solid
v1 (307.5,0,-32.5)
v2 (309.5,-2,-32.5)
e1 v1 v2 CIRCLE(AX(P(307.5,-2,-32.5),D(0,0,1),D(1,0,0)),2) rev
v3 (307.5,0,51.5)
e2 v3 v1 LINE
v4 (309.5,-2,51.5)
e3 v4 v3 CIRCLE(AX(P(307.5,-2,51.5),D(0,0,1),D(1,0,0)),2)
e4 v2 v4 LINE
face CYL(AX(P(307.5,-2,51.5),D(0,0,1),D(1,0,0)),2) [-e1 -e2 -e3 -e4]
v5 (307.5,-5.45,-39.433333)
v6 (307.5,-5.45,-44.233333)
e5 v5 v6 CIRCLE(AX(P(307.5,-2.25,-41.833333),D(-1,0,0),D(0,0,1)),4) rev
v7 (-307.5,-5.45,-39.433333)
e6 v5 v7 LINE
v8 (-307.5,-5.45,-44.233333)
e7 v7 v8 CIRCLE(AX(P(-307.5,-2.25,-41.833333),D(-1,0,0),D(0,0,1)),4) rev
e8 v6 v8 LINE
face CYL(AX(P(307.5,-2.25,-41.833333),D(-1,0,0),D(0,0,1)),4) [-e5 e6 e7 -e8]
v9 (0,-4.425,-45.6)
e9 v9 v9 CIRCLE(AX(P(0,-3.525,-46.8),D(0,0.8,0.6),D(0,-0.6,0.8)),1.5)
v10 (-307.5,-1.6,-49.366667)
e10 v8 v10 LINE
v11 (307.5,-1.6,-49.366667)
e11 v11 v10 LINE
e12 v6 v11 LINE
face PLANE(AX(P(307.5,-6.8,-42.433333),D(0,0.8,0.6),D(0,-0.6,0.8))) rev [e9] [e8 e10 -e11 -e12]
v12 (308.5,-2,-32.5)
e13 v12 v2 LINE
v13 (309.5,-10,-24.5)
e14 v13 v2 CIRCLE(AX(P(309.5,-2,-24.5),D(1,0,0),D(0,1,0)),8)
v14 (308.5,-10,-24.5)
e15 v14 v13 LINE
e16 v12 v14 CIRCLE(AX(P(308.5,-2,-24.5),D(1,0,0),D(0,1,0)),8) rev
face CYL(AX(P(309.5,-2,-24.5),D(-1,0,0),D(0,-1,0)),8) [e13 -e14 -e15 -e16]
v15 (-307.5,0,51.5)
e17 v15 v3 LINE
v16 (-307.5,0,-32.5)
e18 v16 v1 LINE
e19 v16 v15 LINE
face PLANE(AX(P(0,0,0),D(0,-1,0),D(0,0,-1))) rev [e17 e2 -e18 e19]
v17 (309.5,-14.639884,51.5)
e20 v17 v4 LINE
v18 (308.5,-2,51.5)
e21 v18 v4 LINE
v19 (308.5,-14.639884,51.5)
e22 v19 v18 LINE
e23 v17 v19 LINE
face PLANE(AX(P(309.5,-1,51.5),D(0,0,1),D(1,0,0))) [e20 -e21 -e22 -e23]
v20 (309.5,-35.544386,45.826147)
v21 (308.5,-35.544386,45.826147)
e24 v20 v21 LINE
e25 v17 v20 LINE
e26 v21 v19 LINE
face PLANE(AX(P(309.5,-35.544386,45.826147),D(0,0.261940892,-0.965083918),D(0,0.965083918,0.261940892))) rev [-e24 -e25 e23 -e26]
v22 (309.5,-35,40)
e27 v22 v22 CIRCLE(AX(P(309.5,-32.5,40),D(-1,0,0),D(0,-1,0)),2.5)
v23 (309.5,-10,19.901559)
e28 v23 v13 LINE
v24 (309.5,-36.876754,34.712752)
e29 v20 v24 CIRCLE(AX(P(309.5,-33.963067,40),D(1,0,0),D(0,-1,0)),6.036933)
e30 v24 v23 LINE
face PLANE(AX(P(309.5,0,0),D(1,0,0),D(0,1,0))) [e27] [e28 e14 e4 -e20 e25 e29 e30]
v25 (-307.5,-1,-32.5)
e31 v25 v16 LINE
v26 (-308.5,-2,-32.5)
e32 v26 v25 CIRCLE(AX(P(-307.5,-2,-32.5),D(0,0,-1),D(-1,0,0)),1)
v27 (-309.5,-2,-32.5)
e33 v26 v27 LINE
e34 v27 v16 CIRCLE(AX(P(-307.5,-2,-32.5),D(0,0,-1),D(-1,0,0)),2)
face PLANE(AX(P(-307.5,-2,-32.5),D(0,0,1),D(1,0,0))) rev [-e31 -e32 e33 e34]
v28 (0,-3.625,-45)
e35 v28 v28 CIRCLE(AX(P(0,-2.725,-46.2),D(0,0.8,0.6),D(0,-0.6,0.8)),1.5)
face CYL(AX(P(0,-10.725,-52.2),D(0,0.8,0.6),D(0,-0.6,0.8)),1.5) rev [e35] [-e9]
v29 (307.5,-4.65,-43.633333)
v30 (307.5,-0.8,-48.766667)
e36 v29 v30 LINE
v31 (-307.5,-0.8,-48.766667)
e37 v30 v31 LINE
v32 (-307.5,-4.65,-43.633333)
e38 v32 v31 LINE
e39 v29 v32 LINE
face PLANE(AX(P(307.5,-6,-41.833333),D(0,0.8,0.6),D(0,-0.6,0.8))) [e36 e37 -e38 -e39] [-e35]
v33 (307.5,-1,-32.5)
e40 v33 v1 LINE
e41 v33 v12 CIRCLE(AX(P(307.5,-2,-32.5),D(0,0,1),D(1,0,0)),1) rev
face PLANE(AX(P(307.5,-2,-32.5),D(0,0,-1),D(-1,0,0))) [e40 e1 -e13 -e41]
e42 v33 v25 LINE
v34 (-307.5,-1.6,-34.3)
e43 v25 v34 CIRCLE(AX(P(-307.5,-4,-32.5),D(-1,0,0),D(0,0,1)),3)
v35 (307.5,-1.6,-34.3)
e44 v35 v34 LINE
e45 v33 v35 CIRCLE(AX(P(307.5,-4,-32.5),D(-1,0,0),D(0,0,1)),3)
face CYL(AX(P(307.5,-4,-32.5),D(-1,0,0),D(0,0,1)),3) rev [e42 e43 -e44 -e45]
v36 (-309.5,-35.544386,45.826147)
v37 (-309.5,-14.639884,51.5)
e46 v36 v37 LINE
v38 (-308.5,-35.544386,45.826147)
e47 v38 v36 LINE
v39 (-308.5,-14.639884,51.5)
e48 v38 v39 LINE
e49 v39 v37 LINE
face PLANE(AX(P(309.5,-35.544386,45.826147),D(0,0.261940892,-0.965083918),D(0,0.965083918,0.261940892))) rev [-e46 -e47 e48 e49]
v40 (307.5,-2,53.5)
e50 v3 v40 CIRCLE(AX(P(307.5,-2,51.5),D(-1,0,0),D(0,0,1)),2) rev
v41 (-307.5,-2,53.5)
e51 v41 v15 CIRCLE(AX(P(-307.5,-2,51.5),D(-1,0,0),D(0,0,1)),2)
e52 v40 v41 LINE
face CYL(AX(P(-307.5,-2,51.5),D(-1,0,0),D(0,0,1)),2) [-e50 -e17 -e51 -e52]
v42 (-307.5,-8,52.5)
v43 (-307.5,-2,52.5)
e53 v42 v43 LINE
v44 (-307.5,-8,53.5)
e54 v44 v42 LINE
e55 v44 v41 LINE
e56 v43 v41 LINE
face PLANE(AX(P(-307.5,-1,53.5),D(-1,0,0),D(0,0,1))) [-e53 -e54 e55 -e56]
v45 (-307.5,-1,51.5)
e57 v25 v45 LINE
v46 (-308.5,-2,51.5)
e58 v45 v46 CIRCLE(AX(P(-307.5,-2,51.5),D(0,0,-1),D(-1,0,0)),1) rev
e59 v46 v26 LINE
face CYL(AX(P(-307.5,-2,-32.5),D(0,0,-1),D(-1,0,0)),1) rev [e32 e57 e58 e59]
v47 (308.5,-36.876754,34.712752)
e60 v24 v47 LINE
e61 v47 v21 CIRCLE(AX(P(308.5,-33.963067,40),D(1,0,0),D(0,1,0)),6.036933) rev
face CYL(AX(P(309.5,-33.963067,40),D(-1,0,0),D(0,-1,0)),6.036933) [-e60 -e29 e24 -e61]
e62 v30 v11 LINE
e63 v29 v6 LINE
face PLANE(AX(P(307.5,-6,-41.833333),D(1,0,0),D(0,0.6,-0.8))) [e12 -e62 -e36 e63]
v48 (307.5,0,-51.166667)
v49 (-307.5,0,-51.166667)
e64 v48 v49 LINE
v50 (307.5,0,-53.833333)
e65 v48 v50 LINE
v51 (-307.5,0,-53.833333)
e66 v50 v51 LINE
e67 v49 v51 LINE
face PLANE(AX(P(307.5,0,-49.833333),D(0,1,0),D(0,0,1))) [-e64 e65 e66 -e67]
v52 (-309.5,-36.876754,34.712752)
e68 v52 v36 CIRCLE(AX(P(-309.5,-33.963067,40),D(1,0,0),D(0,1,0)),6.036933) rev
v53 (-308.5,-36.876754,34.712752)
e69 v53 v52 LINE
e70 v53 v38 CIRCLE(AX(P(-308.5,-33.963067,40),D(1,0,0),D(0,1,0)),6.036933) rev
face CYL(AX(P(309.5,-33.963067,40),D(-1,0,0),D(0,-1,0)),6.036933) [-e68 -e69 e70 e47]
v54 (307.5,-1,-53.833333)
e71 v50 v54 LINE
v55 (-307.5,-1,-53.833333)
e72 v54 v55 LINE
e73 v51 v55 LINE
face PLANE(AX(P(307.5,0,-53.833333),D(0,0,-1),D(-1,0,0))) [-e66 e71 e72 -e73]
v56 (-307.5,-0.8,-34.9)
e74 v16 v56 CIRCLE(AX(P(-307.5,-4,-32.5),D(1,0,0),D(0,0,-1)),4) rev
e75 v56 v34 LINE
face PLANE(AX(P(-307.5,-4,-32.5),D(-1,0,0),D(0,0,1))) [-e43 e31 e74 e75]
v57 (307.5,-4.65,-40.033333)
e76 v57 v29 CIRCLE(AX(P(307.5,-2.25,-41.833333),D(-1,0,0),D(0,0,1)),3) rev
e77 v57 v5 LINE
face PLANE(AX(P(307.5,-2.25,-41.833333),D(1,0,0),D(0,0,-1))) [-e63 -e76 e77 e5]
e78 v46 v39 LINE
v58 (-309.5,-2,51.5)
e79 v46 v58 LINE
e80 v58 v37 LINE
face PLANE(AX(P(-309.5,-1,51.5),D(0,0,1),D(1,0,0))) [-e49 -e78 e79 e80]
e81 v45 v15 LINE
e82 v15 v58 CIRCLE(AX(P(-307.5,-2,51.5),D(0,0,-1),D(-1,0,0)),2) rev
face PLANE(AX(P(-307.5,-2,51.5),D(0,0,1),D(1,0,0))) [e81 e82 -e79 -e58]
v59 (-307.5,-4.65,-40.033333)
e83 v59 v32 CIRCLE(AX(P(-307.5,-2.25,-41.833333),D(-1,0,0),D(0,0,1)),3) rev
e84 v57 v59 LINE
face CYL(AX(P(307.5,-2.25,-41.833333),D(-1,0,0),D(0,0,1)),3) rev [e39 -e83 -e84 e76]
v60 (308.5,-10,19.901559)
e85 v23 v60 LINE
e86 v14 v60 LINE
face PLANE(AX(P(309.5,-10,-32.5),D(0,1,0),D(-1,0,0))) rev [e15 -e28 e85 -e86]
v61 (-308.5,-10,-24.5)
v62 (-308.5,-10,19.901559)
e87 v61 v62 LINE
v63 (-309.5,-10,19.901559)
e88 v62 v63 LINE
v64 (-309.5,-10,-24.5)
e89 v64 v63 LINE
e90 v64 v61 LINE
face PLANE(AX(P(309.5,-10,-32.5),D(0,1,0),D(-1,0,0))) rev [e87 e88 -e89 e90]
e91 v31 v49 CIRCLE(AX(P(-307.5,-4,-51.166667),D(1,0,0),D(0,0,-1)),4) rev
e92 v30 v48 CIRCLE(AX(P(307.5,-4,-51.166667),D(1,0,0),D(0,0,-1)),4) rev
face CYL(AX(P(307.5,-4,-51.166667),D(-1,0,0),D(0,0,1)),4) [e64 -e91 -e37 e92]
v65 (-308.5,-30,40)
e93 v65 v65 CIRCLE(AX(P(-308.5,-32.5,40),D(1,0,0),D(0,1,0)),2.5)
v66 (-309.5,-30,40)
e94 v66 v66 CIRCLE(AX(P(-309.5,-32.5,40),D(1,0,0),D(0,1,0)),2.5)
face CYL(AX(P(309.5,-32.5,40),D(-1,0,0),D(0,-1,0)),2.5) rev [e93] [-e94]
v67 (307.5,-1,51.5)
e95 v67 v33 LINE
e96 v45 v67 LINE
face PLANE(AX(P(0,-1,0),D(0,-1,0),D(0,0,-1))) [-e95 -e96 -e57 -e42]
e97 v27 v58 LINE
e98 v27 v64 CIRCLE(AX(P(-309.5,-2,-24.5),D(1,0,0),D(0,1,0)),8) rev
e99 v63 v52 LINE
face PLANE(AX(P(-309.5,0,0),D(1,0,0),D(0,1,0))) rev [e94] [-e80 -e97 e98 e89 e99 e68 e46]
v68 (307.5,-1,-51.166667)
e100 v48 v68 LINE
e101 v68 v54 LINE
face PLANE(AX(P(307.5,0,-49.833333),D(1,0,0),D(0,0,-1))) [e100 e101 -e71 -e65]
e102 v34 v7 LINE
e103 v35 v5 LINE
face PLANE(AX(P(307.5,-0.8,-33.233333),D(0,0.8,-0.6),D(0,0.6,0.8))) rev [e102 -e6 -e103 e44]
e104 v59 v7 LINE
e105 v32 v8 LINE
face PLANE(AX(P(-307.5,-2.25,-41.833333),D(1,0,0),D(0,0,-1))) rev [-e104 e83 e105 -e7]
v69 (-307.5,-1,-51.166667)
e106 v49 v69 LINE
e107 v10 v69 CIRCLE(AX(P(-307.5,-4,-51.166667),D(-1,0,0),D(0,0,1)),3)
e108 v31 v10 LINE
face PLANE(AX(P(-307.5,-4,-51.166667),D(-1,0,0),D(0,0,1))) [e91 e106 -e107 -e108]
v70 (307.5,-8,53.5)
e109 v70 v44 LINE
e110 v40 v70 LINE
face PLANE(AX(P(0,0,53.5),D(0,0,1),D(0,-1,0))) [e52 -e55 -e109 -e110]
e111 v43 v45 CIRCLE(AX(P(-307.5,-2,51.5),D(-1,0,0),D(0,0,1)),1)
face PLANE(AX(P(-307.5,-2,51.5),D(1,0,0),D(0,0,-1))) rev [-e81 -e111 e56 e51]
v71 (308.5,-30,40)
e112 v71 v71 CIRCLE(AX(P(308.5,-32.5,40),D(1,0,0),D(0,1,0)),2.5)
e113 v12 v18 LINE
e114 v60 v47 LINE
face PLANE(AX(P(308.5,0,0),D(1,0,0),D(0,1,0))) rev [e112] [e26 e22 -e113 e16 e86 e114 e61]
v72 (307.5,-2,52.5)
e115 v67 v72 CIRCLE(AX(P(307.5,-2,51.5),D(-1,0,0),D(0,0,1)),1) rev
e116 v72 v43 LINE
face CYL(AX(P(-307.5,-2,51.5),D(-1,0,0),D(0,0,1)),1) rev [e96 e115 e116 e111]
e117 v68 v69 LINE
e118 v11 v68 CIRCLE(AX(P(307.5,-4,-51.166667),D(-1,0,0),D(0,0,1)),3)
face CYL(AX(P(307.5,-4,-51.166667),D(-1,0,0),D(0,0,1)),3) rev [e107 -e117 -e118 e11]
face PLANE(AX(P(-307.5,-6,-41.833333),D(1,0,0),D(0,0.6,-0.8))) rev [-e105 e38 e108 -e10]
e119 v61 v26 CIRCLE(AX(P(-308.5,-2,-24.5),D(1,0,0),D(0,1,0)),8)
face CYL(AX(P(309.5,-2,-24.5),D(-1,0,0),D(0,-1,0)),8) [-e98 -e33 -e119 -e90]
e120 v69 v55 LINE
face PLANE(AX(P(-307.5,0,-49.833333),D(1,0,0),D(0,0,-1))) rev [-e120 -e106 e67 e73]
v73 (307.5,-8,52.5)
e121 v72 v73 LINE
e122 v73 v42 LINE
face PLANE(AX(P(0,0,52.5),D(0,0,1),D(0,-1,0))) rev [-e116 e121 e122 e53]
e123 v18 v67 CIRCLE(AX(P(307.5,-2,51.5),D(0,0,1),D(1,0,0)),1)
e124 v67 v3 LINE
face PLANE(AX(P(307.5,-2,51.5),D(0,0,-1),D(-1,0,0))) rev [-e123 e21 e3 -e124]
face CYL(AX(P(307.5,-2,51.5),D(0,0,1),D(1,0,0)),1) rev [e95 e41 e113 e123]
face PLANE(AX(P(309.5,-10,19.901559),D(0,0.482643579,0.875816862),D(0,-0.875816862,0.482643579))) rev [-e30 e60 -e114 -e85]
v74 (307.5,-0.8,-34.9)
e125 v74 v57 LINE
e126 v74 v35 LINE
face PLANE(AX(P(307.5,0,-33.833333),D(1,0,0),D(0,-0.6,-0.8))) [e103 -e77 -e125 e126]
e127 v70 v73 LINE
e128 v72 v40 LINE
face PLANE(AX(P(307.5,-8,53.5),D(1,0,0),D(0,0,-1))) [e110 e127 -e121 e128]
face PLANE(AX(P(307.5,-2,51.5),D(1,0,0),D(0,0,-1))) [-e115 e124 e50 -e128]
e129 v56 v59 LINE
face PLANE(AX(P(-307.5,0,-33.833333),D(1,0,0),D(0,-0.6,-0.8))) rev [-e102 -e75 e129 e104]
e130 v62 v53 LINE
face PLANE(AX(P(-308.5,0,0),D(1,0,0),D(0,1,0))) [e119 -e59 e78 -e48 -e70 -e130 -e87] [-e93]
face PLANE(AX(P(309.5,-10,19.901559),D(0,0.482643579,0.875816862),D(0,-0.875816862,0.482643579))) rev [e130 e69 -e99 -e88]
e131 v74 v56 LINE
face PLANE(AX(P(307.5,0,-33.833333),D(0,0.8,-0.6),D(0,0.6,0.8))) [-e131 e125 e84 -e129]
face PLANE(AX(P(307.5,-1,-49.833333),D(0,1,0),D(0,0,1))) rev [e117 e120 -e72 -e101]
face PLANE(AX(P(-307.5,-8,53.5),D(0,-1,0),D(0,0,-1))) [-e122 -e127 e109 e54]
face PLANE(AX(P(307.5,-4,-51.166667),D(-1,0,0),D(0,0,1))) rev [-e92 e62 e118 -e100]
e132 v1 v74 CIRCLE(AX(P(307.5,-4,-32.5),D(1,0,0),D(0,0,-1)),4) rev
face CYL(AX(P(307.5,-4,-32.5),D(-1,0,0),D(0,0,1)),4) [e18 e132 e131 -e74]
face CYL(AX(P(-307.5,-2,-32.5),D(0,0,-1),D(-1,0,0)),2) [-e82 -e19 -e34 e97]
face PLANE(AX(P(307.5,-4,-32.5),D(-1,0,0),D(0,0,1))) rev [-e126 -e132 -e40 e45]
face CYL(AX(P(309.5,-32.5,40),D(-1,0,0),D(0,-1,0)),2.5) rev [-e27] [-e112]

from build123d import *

# Parameters (mm, degrees)
SKETCH1_W                    = 615
SKETCH1_H                    = 105
BASE_FLANGE1_DEPTH           = 1
EDGE_FLANGE1_STRIP_W         = 6
EDGE_FLANGE1_STRIP_H         = 1
EDGE_FLANGE1_STRIP_CUT_DEPTH = 615
EDGE_FLANGE1_DEPTH           = 615
SKETCH16_W                   = 615
SKETCH16_H                   = 196.52545168
CUT_EXTRUDE1_DEPTH           = 10
SWEPT_START                  = -307.5
SWEPT_FLANGE1_DEPTH          = 615
EDGE_FLANGE2_DEPTH           = 84
EDGE_FLANGE2_BEND_DEPTH      = 84
CUT_EXTRUDE2_DEPTH           = 623.622700982
CUT_EXTRUDE2_DEPTH_BACK      = 623.622700982
SKETCH39_R                   = 2.5
FILLET1_R                    = 8
SKETCH45_R                   = 1.5
CUT_EXTRUDE3_DEPTH           = 10


# Read off the part's stored shape, not the designer's step: Swept Flange1
# Sheet-metal steps are written as plain solids
with BuildPart() as part:
    # Sketch1 → Base-Flange1 (new body)
    with BuildSketch(Plane(origin=(0, 0, 0), x_dir=(1, 0, 0), z_dir=(0, 1, 0))):
        Rectangle(SKETCH1_W, SKETCH1_H)
    extrude(amount=-BASE_FLANGE1_DEPTH)

    # Edge-Flange1 strip (across the edge) → Edge-Flange1 strip cut (cut)
    with BuildSketch(Plane(origin=(307.5, -1, 52.5), x_dir=(0, 0, -1), z_dir=(-1, 0, 0))):
        with Locations((-2, -0.5)):
            Rectangle(EDGE_FLANGE1_STRIP_W, EDGE_FLANGE1_STRIP_H)
    extrude(amount=EDGE_FLANGE1_STRIP_CUT_DEPTH, mode=Mode.SUBTRACT)

    # Edge-Flange1 section (across the edge) → Edge-Flange1 (add)
    with BuildSketch(Plane(origin=(307.5, -1, 52.5), x_dir=(0, 0, -1), z_dir=(-1, 0, 0))):
        with BuildLine():
            Line((-1, 1), (-1, 7))
            Line((-1, 7), (0, 7))
            Line((0, 7), (0, 1))
            ThreePointArc((0, 1), (0.292893219, 0.292893219), (1, 0))
            Line((1, 0), (1, -1))
            ThreePointArc((1, -1), (-0.414213562, -0.414213562), (-1, 1))
        make_face()
    extrude(amount=EDGE_FLANGE1_DEPTH)

    # Sketch16 → Cut-Extrude1 (cut)
    with BuildSketch(Plane(origin=(0, 0, 0), x_dir=(1, 0, 0), z_dir=(0, 1, 0))):
        with Locations((0, 130.76272584)):
            Rectangle(SKETCH16_W, SKETCH16_H)
    extrude(amount=-CUT_EXTRUDE1_DEPTH, mode=Mode.SUBTRACT)

    # Swept Flange1 outline → Swept Flange1 (add)
    with BuildSketch(Plane.YZ.offset(SWEPT_START)):
        with BuildLine():
            Line((-1, -51.166666667), (-1, -53.833333333))
            Line((-1, -53.833333333), (0, -53.833333333))
            Line((0, -53.833333333), (0, -51.166666667))
            ThreePointArc((0, -51.166666667), (-0.205266808, -49.901755603), (-0.8, -48.766666667))
            Line((-0.8, -48.766666667), (-4.65, -43.633333333))
            ThreePointArc((-4.65, -43.633333333), (-5.25, -41.833333333), (-4.65, -40.033333333))
            Line((-4.65, -40.033333333), (-0.8, -34.9))
            ThreePointArc((-0.8, -34.9), (-0.205266808, -33.764911064), (0, -32.5))
            Line((0, -32.5), (-1, -32.5))
            ThreePointArc((-1, -32.5), (-1.153950106, -33.448683298), (-1.6, -34.3))
            Line((-1.6, -34.3), (-5.45, -39.433333333))
            ThreePointArc((-5.45, -39.433333333), (-6.25, -41.833333333), (-5.45, -44.233333333))
            Line((-5.45, -44.233333333), (-1.6, -49.366666667))
            ThreePointArc((-1.6, -49.366666667), (-1.153950106, -50.217983369), (-1, -51.166666667))
        make_face()
    extrude(amount=SWEPT_FLANGE1_DEPTH)

    # Edge-Flange2 section (across the edge) → Edge-Flange2 (add)
    with BuildSketch(Plane(origin=(308.5, -1, -32.5), x_dir=(-1, 0, 0), z_dir=(0, 0, 1))):
        with BuildLine():
            Line((-1, 1), (-1, 39))
            Line((-1, 39), (0, 39))
            Line((0, 39), (0, 1))
            ThreePointArc((0, 1), (0.292893219, 0.292893219), (1, 0))
            Line((1, 0), (1, -1))
            ThreePointArc((1, -1), (-0.414213562, -0.414213562), (-1, 1))
        make_face()
    extrude(amount=EDGE_FLANGE2_DEPTH)

    # Edge-Flange2 section 2 (across the edge) → Edge-Flange2 bend (add)
    with BuildSketch(Plane(origin=(-308.5, -1, 51.5), x_dir=(1, 0, 0), z_dir=(0, 0, -1))):
        with BuildLine():
            Line((-1, 1), (-1, 39))
            Line((-1, 39), (0, 39))
            Line((0, 39), (0, 1))
            ThreePointArc((0, 1), (0.292893219, 0.292893219), (1, 0))
            Line((1, 0), (1, -1))
            ThreePointArc((1, -1), (-0.414213562, -0.414213562), (-1, 1))
        make_face()
    extrude(amount=EDGE_FLANGE2_BEND_DEPTH)

    # Sketch39 → Cut-Extrude2 (cut, two sides: drawn at the far end of the back side and taken through both)
    with BuildSketch(Plane.ZY.offset(309.5).offset(-CUT_EXTRUDE2_DEPTH_BACK)):
        with Locations(Location((40, -32.5, 0), (0, 0, 90))):
            Circle(SKETCH39_R)
        with BuildLine():
            Line((-32.5, -10), (19.901558991, -10))
            Line((19.901558991, -10), (34.712752069, -36.876753821))
            ThreePointArc((34.712752069, -36.876753821), (36.929590525, -39.160869046), (40, -40))
            ThreePointArc((40, -40), (43.667304301, -38.758423068), (45.82614719, -35.544386433))
            Line((45.82614719, -35.544386433), (51.5, -14.63988364))
            Line((51.5, -14.63988364), (60.41713226, -14.63988364))
            Line((60.41713226, -14.63988364), (60.41713226, -59.649041705))
            Line((60.41713226, -59.649041705), (-51.871278106, -59.649041705))
            Line((-51.871278106, -59.649041705), (-51.871278106, -10))
            Line((-51.871278106, -10), (-32.5, -10))
        make_face()
    extrude(amount=CUT_EXTRUDE2_DEPTH + CUT_EXTRUDE2_DEPTH_BACK, mode=Mode.SUBTRACT)

    # Fillet1
    fillet1_edges = [part.edges().sort_by_distance(p)[0] for p in [
        (-309, -10, -32.5),
        (309, -10, -32.5),
    ]]
    fillet(fillet1_edges, radius=FILLET1_R)

    # Sketch45 → Cut-Extrude3 (cut)
    with BuildSketch(Plane(origin=(0, -23.92, -17.94), x_dir=(1, 0, 0), z_dir=(0, 0.7999999999999998, 0.6000000000000002))):
        with Locations(Location((0, 35.325, 0), (0, 0, 270))):
            Circle(SKETCH45_R)
    extrude(amount=-CUT_EXTRUDE3_DEPTH, mode=Mode.SUBTRACT)


solid = part.part
